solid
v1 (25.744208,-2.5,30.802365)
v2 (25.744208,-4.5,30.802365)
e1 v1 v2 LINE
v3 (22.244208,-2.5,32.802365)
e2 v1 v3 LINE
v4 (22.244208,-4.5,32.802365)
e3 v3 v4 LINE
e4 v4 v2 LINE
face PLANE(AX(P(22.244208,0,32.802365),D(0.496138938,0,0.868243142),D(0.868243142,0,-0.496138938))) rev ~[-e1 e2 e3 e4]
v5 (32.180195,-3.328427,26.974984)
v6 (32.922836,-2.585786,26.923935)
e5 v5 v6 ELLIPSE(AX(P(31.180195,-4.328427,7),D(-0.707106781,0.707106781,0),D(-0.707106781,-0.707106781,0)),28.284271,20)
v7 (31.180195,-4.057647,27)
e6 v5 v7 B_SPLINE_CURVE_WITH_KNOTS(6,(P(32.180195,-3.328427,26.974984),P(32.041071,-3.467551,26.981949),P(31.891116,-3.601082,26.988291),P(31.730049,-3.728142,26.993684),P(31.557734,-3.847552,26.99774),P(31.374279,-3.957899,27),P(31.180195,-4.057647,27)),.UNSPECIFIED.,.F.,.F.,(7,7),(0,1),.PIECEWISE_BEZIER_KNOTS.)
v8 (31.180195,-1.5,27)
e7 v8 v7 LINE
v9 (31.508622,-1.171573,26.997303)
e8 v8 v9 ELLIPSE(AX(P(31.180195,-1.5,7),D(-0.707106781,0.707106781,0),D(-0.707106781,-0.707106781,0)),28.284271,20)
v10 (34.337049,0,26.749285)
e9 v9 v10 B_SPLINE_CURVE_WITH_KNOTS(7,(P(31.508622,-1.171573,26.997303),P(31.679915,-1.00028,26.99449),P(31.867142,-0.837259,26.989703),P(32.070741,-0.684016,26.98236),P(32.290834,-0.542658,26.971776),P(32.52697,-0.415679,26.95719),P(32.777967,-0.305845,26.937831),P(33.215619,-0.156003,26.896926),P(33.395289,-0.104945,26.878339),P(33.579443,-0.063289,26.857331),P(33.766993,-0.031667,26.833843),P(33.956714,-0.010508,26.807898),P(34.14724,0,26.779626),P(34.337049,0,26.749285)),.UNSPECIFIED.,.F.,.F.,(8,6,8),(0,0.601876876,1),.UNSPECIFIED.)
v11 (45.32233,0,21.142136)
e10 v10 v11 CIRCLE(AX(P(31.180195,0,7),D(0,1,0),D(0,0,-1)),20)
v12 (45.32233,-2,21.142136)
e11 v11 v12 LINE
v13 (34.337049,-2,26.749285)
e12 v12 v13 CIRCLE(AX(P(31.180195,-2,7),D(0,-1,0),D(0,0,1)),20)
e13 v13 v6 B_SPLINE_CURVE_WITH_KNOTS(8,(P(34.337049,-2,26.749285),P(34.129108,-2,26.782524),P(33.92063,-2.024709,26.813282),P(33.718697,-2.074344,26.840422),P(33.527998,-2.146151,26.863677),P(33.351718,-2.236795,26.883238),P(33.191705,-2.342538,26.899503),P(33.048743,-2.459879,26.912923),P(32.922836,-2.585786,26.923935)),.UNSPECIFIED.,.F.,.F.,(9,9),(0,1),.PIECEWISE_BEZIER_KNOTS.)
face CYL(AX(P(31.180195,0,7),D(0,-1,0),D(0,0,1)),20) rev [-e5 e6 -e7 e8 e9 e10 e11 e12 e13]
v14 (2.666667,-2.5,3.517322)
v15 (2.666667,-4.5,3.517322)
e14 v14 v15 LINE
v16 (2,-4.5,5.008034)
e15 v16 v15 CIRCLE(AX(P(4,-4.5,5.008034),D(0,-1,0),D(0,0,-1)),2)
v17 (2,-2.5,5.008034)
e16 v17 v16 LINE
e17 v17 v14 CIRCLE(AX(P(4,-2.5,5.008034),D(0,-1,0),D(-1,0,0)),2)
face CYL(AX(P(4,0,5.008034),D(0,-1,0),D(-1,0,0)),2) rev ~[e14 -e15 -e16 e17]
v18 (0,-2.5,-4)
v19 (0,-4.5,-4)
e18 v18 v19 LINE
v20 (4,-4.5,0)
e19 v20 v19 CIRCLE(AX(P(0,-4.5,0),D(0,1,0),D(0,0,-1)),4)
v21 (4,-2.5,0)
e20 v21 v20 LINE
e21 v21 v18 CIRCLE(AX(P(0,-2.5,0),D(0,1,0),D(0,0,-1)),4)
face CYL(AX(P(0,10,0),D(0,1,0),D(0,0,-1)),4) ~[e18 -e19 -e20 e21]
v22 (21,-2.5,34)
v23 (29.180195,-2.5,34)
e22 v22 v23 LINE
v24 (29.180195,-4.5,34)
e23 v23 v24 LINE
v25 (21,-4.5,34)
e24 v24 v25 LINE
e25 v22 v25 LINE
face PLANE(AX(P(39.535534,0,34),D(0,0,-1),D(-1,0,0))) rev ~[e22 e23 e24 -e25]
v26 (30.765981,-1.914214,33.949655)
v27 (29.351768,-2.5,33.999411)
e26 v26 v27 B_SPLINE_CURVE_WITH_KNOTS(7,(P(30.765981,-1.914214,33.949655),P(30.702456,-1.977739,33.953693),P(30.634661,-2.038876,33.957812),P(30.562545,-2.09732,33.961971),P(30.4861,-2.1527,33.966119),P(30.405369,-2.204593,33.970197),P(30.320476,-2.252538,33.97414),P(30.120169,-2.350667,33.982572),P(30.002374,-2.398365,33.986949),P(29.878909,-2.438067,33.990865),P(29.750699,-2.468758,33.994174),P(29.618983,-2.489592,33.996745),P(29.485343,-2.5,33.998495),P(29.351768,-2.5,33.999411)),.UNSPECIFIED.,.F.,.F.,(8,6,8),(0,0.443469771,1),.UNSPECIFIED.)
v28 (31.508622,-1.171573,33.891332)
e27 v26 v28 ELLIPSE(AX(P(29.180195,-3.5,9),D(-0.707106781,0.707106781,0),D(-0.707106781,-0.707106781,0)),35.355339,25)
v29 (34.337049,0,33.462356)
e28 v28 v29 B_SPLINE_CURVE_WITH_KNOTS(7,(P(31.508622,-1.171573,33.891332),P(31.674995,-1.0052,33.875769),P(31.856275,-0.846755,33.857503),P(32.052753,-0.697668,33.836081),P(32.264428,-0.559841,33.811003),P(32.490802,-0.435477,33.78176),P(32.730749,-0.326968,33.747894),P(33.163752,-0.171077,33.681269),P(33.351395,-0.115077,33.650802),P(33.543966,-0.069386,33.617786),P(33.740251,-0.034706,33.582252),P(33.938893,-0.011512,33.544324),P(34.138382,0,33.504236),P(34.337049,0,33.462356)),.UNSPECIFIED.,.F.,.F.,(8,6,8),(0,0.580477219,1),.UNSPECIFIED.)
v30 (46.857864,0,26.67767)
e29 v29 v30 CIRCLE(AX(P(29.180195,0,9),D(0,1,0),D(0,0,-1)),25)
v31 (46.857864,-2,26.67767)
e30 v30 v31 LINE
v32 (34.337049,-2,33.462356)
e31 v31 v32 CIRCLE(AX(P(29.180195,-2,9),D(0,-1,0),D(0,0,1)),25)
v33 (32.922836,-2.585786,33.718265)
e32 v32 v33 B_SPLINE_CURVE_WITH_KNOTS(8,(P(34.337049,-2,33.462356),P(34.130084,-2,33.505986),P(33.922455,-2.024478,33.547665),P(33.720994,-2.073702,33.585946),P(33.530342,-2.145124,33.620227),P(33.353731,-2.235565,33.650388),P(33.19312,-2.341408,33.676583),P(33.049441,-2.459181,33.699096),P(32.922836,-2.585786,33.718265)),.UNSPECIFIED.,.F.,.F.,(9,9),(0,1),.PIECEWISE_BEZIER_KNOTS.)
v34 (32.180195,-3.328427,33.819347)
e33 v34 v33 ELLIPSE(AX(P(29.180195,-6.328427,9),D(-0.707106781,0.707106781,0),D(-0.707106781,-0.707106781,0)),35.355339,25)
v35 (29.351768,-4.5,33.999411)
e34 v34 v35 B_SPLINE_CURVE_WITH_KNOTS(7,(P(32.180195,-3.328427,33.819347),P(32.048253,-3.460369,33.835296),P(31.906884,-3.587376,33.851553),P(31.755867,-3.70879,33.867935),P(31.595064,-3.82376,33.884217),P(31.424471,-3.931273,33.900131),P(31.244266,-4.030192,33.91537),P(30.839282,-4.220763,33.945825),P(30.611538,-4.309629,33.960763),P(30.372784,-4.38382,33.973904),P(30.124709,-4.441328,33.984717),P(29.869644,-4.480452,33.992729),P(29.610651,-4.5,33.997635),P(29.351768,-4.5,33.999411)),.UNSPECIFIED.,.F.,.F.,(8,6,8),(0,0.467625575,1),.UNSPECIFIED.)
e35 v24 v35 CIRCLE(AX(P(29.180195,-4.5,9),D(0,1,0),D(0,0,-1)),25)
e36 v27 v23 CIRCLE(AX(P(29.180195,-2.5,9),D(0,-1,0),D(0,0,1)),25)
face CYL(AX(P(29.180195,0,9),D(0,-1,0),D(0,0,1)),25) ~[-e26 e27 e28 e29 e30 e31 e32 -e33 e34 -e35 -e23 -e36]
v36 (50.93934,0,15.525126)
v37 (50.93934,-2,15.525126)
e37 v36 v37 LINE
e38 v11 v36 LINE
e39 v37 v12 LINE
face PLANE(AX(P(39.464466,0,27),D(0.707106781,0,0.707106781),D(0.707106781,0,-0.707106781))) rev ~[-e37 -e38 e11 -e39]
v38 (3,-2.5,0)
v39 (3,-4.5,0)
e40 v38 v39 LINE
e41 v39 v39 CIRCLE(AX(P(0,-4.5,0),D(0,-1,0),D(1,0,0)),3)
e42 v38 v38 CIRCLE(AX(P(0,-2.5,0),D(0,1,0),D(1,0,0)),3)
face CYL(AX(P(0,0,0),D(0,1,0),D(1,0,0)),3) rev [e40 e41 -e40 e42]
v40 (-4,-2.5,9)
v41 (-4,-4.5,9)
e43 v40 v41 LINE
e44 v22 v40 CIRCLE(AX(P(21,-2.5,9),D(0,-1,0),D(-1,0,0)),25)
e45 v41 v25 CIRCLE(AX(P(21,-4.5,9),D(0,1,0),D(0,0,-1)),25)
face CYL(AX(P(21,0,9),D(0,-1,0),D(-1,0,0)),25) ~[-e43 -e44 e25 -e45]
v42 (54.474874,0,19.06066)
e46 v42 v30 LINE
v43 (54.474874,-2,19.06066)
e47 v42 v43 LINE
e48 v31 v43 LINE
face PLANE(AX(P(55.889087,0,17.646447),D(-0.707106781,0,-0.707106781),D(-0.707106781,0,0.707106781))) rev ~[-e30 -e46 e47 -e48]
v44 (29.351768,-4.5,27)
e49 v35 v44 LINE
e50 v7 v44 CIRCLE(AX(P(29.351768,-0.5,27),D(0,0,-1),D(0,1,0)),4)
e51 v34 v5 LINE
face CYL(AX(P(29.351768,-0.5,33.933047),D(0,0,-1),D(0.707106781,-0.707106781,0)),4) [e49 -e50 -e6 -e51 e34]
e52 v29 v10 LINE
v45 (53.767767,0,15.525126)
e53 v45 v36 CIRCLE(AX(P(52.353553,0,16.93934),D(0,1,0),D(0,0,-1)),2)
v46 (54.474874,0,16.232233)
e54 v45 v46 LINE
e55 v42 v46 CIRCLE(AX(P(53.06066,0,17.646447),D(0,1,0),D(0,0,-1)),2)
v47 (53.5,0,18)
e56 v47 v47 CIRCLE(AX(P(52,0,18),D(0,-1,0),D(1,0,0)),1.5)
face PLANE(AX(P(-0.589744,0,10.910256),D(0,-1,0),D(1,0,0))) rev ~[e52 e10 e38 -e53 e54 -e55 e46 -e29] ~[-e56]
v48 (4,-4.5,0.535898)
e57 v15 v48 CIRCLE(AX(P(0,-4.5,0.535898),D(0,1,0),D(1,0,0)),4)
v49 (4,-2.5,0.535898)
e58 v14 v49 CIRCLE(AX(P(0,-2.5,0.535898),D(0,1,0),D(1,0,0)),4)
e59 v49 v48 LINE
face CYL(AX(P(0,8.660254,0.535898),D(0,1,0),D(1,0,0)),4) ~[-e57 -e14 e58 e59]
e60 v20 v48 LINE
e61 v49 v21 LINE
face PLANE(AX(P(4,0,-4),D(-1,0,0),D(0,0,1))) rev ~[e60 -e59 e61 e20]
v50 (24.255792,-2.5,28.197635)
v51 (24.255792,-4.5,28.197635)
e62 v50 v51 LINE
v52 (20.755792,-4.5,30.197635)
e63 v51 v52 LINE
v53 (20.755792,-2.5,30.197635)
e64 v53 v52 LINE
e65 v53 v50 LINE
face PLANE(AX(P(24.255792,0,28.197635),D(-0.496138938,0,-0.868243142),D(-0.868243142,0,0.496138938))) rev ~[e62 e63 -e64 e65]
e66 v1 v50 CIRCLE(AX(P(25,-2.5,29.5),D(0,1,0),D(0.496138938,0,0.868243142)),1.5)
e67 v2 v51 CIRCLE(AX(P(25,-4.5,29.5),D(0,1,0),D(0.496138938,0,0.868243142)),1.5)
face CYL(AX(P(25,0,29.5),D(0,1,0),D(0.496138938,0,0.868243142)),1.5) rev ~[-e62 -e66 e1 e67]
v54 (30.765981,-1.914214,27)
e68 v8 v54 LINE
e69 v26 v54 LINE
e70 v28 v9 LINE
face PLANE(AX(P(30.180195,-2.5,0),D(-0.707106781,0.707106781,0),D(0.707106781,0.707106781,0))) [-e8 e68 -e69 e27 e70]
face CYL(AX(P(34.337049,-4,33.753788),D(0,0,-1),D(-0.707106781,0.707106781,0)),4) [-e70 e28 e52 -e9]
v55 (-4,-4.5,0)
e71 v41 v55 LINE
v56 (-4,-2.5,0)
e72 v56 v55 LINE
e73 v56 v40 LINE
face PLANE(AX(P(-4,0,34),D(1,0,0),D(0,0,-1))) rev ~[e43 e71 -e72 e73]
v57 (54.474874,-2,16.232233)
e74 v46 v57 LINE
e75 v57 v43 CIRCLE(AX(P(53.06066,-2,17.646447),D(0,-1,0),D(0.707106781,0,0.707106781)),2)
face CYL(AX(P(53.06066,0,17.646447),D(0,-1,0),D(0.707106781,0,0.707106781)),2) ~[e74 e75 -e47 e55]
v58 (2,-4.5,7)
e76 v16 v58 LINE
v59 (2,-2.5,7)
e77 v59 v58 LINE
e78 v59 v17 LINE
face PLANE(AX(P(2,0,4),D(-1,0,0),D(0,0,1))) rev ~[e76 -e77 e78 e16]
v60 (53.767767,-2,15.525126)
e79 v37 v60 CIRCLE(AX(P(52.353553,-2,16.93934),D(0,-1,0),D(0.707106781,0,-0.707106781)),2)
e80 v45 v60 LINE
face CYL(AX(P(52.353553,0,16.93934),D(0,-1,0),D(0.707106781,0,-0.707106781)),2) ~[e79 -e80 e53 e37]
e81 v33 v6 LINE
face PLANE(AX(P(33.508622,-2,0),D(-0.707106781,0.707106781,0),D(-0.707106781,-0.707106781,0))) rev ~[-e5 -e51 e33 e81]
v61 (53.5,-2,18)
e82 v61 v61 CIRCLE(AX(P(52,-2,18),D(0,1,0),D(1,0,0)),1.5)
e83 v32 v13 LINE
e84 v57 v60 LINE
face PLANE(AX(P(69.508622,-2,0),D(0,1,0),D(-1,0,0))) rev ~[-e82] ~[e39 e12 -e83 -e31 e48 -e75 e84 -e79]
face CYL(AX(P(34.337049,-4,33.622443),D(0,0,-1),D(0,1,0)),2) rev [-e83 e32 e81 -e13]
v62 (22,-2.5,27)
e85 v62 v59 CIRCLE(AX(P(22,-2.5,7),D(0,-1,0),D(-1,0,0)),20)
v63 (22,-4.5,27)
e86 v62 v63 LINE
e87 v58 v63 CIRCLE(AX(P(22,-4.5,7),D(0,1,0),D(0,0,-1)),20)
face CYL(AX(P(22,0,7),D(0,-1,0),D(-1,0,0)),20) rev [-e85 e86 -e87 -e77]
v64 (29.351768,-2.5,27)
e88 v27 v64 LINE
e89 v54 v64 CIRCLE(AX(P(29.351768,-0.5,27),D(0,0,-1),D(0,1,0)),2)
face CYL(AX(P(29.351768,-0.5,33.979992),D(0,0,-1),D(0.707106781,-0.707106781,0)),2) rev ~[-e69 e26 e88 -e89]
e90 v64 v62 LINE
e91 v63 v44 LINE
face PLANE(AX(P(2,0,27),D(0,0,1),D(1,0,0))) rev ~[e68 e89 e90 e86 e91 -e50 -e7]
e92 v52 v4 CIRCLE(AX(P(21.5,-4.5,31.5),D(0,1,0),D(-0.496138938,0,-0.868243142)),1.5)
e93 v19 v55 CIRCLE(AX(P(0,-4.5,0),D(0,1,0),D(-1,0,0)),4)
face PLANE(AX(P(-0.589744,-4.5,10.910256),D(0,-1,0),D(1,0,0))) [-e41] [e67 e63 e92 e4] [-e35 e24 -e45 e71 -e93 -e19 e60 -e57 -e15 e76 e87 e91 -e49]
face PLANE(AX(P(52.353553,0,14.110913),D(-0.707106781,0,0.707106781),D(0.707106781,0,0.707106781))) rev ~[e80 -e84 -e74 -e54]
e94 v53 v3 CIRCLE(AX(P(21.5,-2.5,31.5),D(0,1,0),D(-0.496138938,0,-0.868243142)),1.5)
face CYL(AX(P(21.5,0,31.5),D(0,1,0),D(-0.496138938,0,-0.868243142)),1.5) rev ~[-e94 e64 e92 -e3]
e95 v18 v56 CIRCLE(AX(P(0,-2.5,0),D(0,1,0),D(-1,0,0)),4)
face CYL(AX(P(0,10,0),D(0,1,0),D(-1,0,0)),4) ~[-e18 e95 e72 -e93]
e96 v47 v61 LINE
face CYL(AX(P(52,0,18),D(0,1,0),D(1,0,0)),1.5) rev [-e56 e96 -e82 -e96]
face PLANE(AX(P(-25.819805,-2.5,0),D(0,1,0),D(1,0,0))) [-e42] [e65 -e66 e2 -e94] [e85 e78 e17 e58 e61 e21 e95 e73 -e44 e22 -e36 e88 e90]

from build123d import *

# Parameters (mm, degrees)
F0_R        = 3
F0_R_2      = 1.5
F1_DEPTH    = 4.5
F2_R        = 20
F3_R        = 25
F4_R        = 25
F5_T1_DEPTH = 24.5
F5_T3_DEPTH = 21.8205080757
F6_R        = 2
F8_DEPTH    = 50
F9_R        = 2
F10_R       = 4


# Not quite as in the source:
# - a fillet or chamfer that OpenCascade refuses, or shapes differently, is made with other operations: its cross-section is extruded or revolved along the edge and cut away or added
# - a feature names something its author has since deleted; it is built from what else it names


with BuildPart() as f1:
    # F0 (on Front) → F1 (new body)
    with BuildSketch(Plane.XZ):
        Polygon((-4, 27), (-4, -4), (4, -4), (4, 4), (2, 4), (2, 27), align=None)
        Circle(F0_R, mode=Mode.SUBTRACT)
        Polygon((-4, 34), (-4, 27), (2, 27), (4, 27), (39.4644660941, 27), (52.3535533906, 14.1109127035), (55.8890872965, 17.6464466094), (39.5355339059, 34), align=None)
        with BuildLine():
            ThreePointArc((25.7442084075, 30.8023647132), (26.3023647132, 28.7557915925), (24.2557915925, 28.1976352868))
            Line((24.2557915925, 28.1976352868), (20.7557915925, 30.1976352868))
            ThreePointArc((20.7557915925, 30.1976352868), (20.1976352868, 32.2442084075), (22.2442084075, 32.8023647132))
            Line((22.2442084075, 32.8023647132), (25.7442084075, 30.8023647132))
        make_face(mode=Mode.SUBTRACT)
        with Locations((52, 18)):
            Circle(F0_R_2, mode=Mode.SUBTRACT)
    extrude(amount=F1_DEPTH)

    # F2
    f2_edges = [f1.edges().sort_by_distance(p)[0] for p in [
        (39.464466, -2.25, 27),
        (2, -2.25, 27),
    ]]
    fillet(f2_edges, radius=F2_R)

    # F3
    f3_edges = [f1.edges().sort_by_distance(p)[0] for p in [
        (-4, -2.25, 34),
    ]]
    fillet(f3_edges, radius=F3_R)

    # F4
    f4_edges = [f1.edges().sort_by_distance(p)[0] for p in [
        (39.535534, -2.25, 34),
    ]]
    fillet(f4_edges, radius=F4_R)

    # F5: fillet of radius 4 on 3 edges, made by hand

    # F5_s2 → F5_t1 (cut)
    with BuildSketch(Plane.XZ.offset(-10)):
        with BuildLine():
            ThreePointArc((0, -4), (2.8284271247, -2.8284271247), (4, 0))
            Line((4, 0), (4, -4))
            Line((4, -4), (0, -4))
        make_face()
        with BuildLine():
            ThreePointArc((-4, 0), (-2.8284271247, -2.8284271247), (0, -4))
            Line((0, -4), (-4, -4))
            Line((-4, -4), (-4, 0))
        make_face()
    extrude(amount=F5_T1_DEPTH, mode=Mode.SUBTRACT)

    # F5_s4 → F5_t3 (cut)
    with BuildSketch(Plane.XZ.offset(-8.6602540378)):
        with BuildLine():
            ThreePointArc((4, 0.5358983849), (3.4641016151, 2.5358983849), (2, 4))
            Line((2, 4), (4, 4))
            Line((4, 4), (4, 0.5358983849))
        make_face()
    extrude(amount=F5_T3_DEPTH, mode=Mode.SUBTRACT)

    # F6
    f6_edges = [f1.edges().sort_by_distance(p)[0] for p in [
        (2, -2.25, 4),
        (52.353553, -2.25, 14.110913),
        (55.889087, -2.25, 17.646447),
    ]]
    fillet(f6_edges, radius=F6_R)

    # F7 (on Top) → F8 (cut, symmetric)
    with BuildSketch(Plane.XY):
        Polygon((34.1801948466, 1.5), (-25.8198051534, 1.5), (-25.8198051534, -2.5), (30.1801948466, -2.5), align=None)
        Polygon((33.5086219714, -2), (29.5086219714, -6), (69.5086219714, -6), (69.5086219714, -2), align=None)
    extrude(amount=F8_DEPTH, both=True, mode=Mode.SUBTRACT)

    # F9
    f9_edges = [f1.edges().sort_by_distance(p)[0] for p in [
        (33.508622, -2, 30.243221),
        (30.180195, -2.5, 30.489996),
    ]]
    fillet(f9_edges, radius=F9_R)

    # F10
    f10_edges = [f1.edges().sort_by_distance(p)[0] for p in [
        (31.008622, -4.5, 30.466524),
        (32.680195, 0, 30.348729),
    ]]
    fillet(f10_edges, radius=F10_R)


solid = f1.part
